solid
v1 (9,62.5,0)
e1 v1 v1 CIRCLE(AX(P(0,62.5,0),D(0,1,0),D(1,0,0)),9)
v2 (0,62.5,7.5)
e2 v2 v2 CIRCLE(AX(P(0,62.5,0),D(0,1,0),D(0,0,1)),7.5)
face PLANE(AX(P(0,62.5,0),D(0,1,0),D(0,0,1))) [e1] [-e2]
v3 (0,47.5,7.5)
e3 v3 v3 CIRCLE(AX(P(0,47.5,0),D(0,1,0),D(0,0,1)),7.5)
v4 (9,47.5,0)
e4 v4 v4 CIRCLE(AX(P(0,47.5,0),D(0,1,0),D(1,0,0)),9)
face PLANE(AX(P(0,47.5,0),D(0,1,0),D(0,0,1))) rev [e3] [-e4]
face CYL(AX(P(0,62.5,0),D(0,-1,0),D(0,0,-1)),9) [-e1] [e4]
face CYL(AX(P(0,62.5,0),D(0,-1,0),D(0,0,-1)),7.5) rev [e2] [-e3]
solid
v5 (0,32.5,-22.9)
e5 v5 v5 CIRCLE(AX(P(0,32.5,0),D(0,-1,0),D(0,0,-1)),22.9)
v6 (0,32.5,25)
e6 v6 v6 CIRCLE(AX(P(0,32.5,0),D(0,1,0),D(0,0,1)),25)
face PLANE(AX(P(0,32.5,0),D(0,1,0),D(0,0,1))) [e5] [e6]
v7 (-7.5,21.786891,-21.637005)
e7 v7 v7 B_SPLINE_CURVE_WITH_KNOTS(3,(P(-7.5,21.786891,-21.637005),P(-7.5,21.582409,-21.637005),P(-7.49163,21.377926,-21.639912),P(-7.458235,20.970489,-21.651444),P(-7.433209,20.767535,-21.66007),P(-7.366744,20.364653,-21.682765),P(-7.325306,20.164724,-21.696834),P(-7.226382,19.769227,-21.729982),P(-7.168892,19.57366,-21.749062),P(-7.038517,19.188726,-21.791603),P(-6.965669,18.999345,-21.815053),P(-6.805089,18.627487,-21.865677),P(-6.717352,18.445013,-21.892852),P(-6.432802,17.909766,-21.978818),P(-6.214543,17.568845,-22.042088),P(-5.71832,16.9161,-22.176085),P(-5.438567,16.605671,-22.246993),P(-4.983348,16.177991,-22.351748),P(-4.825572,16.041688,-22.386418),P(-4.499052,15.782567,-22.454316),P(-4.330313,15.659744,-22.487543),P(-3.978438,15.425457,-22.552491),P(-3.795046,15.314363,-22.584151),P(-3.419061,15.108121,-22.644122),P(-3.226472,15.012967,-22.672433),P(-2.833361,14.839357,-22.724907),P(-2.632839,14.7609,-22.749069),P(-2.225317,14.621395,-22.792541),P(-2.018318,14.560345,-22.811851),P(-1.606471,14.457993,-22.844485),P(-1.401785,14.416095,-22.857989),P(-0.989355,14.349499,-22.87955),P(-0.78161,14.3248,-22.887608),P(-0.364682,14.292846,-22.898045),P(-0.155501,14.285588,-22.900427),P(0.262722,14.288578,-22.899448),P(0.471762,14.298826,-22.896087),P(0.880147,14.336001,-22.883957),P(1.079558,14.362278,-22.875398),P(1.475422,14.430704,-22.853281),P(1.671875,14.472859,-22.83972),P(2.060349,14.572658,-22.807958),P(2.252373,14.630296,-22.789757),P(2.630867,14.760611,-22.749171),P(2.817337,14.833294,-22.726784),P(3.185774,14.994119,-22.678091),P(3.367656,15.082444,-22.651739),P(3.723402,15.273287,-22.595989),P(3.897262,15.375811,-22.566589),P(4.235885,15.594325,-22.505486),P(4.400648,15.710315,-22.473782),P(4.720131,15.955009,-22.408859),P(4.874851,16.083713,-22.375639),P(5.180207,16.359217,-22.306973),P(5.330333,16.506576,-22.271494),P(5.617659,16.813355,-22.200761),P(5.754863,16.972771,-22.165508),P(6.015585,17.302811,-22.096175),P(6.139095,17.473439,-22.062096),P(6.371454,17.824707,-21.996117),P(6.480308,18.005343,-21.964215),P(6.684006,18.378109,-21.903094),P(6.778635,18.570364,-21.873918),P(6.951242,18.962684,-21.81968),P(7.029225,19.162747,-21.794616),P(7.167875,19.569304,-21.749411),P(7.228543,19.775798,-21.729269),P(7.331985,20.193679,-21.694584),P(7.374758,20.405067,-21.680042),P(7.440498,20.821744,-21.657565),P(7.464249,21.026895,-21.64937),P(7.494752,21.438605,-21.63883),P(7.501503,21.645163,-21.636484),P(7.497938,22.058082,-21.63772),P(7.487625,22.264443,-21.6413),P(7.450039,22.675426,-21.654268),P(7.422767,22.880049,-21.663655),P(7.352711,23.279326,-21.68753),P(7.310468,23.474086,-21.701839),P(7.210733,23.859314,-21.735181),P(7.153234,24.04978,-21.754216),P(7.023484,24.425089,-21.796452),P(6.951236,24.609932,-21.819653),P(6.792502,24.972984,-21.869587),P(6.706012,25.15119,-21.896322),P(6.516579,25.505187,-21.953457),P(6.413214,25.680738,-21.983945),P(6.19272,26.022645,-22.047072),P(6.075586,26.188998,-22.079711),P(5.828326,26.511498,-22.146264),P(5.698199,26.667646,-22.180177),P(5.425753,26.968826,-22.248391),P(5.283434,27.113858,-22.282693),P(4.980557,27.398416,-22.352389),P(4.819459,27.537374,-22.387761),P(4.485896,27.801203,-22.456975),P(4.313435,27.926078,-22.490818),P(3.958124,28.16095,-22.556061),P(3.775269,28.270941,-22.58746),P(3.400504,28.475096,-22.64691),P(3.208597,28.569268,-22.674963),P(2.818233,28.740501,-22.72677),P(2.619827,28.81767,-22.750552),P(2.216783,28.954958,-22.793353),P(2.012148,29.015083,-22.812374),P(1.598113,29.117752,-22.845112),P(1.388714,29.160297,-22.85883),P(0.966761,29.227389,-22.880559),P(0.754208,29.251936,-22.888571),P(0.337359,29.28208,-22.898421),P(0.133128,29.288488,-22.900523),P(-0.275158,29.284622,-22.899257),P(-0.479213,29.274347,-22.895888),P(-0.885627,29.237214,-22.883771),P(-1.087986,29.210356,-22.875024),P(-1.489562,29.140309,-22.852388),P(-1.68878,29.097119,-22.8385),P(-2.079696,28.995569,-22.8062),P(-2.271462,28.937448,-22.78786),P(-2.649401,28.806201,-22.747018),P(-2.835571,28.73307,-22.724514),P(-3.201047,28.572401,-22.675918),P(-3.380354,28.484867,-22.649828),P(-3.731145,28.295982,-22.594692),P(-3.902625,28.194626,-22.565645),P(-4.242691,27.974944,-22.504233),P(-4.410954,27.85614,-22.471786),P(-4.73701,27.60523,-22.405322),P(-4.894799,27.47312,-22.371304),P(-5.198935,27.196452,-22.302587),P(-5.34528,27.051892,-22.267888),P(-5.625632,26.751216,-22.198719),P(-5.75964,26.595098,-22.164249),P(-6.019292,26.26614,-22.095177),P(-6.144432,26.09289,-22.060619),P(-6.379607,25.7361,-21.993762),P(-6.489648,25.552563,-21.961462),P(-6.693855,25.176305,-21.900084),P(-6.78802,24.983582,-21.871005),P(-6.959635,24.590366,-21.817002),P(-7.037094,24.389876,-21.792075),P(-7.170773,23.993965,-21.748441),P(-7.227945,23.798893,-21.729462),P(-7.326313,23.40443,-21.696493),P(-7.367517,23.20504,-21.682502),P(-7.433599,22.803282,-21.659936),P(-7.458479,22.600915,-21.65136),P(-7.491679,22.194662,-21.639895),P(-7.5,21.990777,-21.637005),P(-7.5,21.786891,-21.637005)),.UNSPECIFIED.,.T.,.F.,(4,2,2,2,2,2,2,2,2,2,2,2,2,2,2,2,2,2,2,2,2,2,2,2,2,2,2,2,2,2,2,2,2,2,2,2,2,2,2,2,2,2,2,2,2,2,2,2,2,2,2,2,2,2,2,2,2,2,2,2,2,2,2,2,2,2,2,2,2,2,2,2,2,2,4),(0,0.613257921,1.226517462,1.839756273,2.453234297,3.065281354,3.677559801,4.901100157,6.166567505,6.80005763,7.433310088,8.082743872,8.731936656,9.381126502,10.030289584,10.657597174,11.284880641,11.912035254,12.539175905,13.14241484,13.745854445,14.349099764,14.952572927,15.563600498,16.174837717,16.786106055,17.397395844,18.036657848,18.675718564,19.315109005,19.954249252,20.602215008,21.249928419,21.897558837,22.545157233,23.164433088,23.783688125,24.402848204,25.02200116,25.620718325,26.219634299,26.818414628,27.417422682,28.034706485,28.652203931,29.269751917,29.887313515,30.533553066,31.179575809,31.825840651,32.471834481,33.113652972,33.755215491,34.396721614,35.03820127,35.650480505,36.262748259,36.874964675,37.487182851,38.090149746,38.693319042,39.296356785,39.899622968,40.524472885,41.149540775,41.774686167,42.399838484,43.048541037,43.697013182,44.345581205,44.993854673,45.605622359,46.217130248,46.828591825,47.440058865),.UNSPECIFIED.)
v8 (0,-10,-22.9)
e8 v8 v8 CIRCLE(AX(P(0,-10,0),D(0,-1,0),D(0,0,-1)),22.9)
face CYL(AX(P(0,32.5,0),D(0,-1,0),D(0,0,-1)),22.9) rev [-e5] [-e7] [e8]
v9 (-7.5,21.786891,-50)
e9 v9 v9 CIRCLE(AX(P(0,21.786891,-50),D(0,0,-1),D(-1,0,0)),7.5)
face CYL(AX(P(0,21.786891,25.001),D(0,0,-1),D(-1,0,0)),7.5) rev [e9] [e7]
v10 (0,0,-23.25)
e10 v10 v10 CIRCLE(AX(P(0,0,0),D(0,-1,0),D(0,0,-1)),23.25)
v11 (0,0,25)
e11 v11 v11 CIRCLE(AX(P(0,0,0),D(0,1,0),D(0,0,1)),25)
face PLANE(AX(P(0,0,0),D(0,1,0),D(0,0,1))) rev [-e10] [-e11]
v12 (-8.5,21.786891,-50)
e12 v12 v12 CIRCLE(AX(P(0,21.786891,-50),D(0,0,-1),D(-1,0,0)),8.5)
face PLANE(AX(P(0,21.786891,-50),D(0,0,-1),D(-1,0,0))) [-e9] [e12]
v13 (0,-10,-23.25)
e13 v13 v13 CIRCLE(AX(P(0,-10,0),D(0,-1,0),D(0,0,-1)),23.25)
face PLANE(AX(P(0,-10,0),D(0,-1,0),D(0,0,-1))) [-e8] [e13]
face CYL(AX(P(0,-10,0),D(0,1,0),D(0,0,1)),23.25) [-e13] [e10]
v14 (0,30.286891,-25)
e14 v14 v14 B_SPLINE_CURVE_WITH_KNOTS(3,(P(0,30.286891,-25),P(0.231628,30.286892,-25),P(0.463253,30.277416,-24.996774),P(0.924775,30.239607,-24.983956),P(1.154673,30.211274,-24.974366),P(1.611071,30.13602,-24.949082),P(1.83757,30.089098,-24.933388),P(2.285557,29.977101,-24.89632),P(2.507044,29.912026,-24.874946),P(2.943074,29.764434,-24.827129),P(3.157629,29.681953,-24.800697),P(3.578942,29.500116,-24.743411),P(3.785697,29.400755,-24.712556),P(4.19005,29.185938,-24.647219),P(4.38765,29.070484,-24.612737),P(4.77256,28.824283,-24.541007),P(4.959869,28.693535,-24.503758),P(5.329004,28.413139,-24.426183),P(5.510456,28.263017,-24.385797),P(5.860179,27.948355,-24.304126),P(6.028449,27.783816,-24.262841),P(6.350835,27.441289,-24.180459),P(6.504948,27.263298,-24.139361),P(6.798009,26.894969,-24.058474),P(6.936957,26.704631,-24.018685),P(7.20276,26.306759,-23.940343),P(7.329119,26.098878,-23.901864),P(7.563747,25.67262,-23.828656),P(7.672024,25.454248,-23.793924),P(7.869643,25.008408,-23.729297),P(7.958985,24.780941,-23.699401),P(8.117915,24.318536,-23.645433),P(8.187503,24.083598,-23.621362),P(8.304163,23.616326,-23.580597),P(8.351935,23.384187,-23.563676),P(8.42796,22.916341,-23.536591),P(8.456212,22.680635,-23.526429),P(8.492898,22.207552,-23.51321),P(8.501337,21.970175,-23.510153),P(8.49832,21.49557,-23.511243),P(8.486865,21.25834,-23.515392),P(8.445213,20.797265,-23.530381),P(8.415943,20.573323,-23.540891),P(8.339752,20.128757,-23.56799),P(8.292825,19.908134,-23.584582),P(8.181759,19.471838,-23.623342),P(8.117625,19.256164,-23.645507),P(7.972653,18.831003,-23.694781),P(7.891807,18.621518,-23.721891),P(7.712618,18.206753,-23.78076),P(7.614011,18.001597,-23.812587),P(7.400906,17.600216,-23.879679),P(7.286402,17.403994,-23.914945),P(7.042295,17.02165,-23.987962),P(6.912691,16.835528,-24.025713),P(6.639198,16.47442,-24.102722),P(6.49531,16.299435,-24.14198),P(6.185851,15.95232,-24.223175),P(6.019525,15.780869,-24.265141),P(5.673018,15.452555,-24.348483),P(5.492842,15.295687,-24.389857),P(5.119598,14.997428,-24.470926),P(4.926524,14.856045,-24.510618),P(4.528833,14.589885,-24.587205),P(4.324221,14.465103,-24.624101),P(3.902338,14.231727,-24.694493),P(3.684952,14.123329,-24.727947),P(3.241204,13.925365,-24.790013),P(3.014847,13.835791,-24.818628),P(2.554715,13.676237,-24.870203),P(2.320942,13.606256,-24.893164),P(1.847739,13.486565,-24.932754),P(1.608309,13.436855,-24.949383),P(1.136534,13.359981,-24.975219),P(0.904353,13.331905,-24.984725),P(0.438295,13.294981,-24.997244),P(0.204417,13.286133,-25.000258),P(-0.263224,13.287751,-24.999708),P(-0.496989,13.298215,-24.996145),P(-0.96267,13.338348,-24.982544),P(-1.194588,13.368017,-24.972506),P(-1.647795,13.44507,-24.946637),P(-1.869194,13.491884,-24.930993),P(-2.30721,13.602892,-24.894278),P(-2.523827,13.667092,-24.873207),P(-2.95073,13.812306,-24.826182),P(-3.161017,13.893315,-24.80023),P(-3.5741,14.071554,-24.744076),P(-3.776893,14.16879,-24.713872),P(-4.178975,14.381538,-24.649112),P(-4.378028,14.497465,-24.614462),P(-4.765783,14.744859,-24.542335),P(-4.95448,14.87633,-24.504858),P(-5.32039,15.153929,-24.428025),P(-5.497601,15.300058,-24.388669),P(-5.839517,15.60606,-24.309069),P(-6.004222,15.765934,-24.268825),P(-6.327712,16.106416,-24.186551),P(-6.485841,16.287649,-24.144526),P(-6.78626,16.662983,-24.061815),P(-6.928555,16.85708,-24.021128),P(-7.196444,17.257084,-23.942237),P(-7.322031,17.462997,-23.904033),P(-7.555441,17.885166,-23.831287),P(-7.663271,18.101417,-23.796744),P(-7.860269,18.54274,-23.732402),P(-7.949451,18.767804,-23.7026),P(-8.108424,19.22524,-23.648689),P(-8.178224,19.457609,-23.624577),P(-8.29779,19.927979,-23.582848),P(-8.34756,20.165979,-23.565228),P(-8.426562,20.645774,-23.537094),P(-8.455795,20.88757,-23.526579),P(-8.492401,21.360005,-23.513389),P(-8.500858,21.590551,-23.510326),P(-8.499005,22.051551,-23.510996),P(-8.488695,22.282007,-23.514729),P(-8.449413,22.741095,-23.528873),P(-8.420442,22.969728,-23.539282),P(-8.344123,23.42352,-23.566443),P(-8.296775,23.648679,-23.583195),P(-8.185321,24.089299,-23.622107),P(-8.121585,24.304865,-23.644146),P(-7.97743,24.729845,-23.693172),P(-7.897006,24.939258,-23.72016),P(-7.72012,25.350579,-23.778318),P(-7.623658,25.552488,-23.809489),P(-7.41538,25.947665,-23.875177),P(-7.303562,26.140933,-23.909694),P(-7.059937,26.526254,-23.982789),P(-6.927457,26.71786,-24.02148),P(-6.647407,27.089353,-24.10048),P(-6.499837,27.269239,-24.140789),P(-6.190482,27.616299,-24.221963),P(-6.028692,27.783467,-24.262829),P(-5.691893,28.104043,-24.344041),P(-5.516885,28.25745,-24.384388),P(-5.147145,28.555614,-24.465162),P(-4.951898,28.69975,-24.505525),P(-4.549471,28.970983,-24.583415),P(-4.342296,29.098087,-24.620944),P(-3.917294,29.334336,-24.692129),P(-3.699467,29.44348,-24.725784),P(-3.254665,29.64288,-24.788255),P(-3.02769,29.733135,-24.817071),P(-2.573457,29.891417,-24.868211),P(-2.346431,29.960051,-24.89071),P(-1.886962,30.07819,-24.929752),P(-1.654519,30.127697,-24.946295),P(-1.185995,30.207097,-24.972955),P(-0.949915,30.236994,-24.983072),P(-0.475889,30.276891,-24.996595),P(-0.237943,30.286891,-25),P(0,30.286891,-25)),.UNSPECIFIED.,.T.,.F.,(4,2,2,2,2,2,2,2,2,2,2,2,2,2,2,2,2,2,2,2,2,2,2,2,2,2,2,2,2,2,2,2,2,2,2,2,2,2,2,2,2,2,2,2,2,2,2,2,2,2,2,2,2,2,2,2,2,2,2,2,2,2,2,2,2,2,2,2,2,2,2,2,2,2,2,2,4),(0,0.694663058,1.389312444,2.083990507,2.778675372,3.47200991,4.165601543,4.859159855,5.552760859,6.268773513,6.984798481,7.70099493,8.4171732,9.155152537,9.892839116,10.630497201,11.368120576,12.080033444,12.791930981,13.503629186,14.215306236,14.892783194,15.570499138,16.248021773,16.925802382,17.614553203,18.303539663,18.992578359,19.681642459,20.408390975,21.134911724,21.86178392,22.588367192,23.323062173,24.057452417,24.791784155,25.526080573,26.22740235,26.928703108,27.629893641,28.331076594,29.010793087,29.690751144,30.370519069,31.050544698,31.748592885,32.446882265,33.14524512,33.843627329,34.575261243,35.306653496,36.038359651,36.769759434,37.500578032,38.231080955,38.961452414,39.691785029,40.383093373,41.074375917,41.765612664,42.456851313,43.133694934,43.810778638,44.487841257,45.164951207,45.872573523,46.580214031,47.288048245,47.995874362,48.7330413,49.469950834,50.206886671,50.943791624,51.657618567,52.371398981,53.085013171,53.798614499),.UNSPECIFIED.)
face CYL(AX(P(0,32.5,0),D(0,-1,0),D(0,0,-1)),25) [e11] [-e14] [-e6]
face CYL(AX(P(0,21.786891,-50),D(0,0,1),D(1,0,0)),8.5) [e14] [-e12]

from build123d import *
from build123d.topology import SkipClean

# Parameters (mm, degrees)
SKETCH2_R                       = 25
BOSS_EXTRUDE1_DEPTH             = 32.5
SKETCH3_R                       = 23.25
BOSS_EXTRUDE2_DEPTH             = 10
SKETCH4_R                       = 22.9
CUT_EXTRUDE1_DEPTH              = 56.283360969
SKETCH5_R                       = 9
SKETCH5_R_2                     = 7.5
EXTRUDE_THIN1_DEPTH             = 15
CUT_EXTRUDE2_REACH              = 85.853
CUT_EXTRUDE2_END_RADIUS         = 22.9
SKETCH6_R                       = 7.5
EXTRUDE_THIN4_REACH             = 85.853
EXTRUDE_THIN4_END_RADIUS        = 25
SKETCH6_3_R                     = 8.5
SKETCH6_3_R_2                   = 7.5
EXTRUDE_THIN4_DIRECTION_2_DEPTH = 25


with BuildPart() as part:
    # Sketch2 → Boss-Extrude1 (new body)
    with BuildSketch(Plane(origin=(0, 0, 0), x_dir=(1, 0, 0), z_dir=(0, 1, 0))):
        with Locations(Location((0, 0, 0), (0, 0, 270))):
            Circle(SKETCH2_R)
    extrude(amount=BOSS_EXTRUDE1_DEPTH)

    # Sketch3 → Boss-Extrude2 (add)
    with BuildSketch(Plane.XZ):
        with Locations(Location((0, 0, 0), (0, 0, 270))):
            Circle(SKETCH3_R)
    extrude(amount=BOSS_EXTRUDE2_DEPTH)

    # Sketch4 → Cut-Extrude1 (cut, through all)
    with BuildSketch(Plane.XZ.offset(10)):
        with Locations(Location((0, 0, 0), (0, 0, 270))):
            Circle(SKETCH4_R)
    extrude(amount=-CUT_EXTRUDE1_DEPTH, mode=Mode.SUBTRACT)

    # Cut-Extrude2: up to this cylinder (the profile starts outside it)
    cut_extrude2_end = Plane(origin=(0, 21.786891, 0), z_dir=(0, -1, 0)) * Cylinder(CUT_EXTRUDE2_END_RADIUS, 218.506, mode=Mode.PRIVATE)
    # Sketch6 → Cut-Extrude2 (cut, up to the surface)
    with BuildSketch(Plane(origin=(0, 0, -25), x_dir=(-1, 0, 0), z_dir=(0, 0, -1)), mode=Mode.PRIVATE) as cut_extrude2_sk1:
        with Locations((0, 21.7868914)):
            Circle(SKETCH6_R)
    cut_extrude2_tool1 = extrude(cut_extrude2_sk1.sketch, amount=-CUT_EXTRUDE2_REACH, mode=Mode.PRIVATE) - cut_extrude2_end
    add(cut_extrude2_tool1.solids().sort_by_distance((0, 21.786891, -25))[0], mode=Mode.SUBTRACT)

    # Extrude-Thin4: up to this cylinder (the profile starts outside it)
    extrude_thin4_end = Plane(origin=(0, 21.786891, 0), z_dir=(0, -1, 0)) * Cylinder(EXTRUDE_THIN4_END_RADIUS, 222.706, mode=Mode.PRIVATE)
    # Sketch6<3> → Extrude-Thin4 (add, up to the surface)
    with BuildSketch(Plane(origin=(0, 0, -25), x_dir=(-1, 0, 0), z_dir=(0, 0, -1)), mode=Mode.PRIVATE) as extrude_thin4_sk1:
        with Locations((0, 21.7868914)):
            Circle(SKETCH6_3_R)
        with Locations((0, 21.7868914)):
            Circle(SKETCH6_3_R_2, mode=Mode.SUBTRACT)
    extrude_thin4_tool1 = extrude(extrude_thin4_sk1.sketch, amount=-EXTRUDE_THIN4_REACH, mode=Mode.PRIVATE) - extrude_thin4_end
    add(extrude_thin4_tool1.solids().sort_by_distance((8.259584, 21.786891, -25))[0])
    add(extrude_thin4_tool1.solids().sort_by_distance((8.259584, 21.786891, -25))[1])

    # Sketch6<3> → Extrude-Thin4 direction 2 (add)
    with SkipClean():  # the faces are left unmerged after this step: merging them gives an invalid solid
        with BuildSketch(Plane(origin=(0, 0, -25), x_dir=(-1, 0, 0), z_dir=(0, 0, -1))):
            with Locations((0, 21.7868914)):
                Circle(SKETCH6_3_R)
            with Locations((0, 21.7868914)):
                Circle(SKETCH6_3_R_2, mode=Mode.SUBTRACT)
        extrude(amount=EXTRUDE_THIN4_DIRECTION_2_DEPTH)


with BuildPart() as body_2:
    # Sketch5 → Extrude-Thin1 (new body)
    with BuildSketch(Plane(origin=(0, 47.5, 0), x_dir=(1, 0, 0), z_dir=(0, 1, 0))):
        Circle(SKETCH5_R)
        Circle(SKETCH5_R_2, mode=Mode.SUBTRACT)
    extrude(amount=EXTRUDE_THIN1_DEPTH)


solid = Compound([part.part, body_2.part])
